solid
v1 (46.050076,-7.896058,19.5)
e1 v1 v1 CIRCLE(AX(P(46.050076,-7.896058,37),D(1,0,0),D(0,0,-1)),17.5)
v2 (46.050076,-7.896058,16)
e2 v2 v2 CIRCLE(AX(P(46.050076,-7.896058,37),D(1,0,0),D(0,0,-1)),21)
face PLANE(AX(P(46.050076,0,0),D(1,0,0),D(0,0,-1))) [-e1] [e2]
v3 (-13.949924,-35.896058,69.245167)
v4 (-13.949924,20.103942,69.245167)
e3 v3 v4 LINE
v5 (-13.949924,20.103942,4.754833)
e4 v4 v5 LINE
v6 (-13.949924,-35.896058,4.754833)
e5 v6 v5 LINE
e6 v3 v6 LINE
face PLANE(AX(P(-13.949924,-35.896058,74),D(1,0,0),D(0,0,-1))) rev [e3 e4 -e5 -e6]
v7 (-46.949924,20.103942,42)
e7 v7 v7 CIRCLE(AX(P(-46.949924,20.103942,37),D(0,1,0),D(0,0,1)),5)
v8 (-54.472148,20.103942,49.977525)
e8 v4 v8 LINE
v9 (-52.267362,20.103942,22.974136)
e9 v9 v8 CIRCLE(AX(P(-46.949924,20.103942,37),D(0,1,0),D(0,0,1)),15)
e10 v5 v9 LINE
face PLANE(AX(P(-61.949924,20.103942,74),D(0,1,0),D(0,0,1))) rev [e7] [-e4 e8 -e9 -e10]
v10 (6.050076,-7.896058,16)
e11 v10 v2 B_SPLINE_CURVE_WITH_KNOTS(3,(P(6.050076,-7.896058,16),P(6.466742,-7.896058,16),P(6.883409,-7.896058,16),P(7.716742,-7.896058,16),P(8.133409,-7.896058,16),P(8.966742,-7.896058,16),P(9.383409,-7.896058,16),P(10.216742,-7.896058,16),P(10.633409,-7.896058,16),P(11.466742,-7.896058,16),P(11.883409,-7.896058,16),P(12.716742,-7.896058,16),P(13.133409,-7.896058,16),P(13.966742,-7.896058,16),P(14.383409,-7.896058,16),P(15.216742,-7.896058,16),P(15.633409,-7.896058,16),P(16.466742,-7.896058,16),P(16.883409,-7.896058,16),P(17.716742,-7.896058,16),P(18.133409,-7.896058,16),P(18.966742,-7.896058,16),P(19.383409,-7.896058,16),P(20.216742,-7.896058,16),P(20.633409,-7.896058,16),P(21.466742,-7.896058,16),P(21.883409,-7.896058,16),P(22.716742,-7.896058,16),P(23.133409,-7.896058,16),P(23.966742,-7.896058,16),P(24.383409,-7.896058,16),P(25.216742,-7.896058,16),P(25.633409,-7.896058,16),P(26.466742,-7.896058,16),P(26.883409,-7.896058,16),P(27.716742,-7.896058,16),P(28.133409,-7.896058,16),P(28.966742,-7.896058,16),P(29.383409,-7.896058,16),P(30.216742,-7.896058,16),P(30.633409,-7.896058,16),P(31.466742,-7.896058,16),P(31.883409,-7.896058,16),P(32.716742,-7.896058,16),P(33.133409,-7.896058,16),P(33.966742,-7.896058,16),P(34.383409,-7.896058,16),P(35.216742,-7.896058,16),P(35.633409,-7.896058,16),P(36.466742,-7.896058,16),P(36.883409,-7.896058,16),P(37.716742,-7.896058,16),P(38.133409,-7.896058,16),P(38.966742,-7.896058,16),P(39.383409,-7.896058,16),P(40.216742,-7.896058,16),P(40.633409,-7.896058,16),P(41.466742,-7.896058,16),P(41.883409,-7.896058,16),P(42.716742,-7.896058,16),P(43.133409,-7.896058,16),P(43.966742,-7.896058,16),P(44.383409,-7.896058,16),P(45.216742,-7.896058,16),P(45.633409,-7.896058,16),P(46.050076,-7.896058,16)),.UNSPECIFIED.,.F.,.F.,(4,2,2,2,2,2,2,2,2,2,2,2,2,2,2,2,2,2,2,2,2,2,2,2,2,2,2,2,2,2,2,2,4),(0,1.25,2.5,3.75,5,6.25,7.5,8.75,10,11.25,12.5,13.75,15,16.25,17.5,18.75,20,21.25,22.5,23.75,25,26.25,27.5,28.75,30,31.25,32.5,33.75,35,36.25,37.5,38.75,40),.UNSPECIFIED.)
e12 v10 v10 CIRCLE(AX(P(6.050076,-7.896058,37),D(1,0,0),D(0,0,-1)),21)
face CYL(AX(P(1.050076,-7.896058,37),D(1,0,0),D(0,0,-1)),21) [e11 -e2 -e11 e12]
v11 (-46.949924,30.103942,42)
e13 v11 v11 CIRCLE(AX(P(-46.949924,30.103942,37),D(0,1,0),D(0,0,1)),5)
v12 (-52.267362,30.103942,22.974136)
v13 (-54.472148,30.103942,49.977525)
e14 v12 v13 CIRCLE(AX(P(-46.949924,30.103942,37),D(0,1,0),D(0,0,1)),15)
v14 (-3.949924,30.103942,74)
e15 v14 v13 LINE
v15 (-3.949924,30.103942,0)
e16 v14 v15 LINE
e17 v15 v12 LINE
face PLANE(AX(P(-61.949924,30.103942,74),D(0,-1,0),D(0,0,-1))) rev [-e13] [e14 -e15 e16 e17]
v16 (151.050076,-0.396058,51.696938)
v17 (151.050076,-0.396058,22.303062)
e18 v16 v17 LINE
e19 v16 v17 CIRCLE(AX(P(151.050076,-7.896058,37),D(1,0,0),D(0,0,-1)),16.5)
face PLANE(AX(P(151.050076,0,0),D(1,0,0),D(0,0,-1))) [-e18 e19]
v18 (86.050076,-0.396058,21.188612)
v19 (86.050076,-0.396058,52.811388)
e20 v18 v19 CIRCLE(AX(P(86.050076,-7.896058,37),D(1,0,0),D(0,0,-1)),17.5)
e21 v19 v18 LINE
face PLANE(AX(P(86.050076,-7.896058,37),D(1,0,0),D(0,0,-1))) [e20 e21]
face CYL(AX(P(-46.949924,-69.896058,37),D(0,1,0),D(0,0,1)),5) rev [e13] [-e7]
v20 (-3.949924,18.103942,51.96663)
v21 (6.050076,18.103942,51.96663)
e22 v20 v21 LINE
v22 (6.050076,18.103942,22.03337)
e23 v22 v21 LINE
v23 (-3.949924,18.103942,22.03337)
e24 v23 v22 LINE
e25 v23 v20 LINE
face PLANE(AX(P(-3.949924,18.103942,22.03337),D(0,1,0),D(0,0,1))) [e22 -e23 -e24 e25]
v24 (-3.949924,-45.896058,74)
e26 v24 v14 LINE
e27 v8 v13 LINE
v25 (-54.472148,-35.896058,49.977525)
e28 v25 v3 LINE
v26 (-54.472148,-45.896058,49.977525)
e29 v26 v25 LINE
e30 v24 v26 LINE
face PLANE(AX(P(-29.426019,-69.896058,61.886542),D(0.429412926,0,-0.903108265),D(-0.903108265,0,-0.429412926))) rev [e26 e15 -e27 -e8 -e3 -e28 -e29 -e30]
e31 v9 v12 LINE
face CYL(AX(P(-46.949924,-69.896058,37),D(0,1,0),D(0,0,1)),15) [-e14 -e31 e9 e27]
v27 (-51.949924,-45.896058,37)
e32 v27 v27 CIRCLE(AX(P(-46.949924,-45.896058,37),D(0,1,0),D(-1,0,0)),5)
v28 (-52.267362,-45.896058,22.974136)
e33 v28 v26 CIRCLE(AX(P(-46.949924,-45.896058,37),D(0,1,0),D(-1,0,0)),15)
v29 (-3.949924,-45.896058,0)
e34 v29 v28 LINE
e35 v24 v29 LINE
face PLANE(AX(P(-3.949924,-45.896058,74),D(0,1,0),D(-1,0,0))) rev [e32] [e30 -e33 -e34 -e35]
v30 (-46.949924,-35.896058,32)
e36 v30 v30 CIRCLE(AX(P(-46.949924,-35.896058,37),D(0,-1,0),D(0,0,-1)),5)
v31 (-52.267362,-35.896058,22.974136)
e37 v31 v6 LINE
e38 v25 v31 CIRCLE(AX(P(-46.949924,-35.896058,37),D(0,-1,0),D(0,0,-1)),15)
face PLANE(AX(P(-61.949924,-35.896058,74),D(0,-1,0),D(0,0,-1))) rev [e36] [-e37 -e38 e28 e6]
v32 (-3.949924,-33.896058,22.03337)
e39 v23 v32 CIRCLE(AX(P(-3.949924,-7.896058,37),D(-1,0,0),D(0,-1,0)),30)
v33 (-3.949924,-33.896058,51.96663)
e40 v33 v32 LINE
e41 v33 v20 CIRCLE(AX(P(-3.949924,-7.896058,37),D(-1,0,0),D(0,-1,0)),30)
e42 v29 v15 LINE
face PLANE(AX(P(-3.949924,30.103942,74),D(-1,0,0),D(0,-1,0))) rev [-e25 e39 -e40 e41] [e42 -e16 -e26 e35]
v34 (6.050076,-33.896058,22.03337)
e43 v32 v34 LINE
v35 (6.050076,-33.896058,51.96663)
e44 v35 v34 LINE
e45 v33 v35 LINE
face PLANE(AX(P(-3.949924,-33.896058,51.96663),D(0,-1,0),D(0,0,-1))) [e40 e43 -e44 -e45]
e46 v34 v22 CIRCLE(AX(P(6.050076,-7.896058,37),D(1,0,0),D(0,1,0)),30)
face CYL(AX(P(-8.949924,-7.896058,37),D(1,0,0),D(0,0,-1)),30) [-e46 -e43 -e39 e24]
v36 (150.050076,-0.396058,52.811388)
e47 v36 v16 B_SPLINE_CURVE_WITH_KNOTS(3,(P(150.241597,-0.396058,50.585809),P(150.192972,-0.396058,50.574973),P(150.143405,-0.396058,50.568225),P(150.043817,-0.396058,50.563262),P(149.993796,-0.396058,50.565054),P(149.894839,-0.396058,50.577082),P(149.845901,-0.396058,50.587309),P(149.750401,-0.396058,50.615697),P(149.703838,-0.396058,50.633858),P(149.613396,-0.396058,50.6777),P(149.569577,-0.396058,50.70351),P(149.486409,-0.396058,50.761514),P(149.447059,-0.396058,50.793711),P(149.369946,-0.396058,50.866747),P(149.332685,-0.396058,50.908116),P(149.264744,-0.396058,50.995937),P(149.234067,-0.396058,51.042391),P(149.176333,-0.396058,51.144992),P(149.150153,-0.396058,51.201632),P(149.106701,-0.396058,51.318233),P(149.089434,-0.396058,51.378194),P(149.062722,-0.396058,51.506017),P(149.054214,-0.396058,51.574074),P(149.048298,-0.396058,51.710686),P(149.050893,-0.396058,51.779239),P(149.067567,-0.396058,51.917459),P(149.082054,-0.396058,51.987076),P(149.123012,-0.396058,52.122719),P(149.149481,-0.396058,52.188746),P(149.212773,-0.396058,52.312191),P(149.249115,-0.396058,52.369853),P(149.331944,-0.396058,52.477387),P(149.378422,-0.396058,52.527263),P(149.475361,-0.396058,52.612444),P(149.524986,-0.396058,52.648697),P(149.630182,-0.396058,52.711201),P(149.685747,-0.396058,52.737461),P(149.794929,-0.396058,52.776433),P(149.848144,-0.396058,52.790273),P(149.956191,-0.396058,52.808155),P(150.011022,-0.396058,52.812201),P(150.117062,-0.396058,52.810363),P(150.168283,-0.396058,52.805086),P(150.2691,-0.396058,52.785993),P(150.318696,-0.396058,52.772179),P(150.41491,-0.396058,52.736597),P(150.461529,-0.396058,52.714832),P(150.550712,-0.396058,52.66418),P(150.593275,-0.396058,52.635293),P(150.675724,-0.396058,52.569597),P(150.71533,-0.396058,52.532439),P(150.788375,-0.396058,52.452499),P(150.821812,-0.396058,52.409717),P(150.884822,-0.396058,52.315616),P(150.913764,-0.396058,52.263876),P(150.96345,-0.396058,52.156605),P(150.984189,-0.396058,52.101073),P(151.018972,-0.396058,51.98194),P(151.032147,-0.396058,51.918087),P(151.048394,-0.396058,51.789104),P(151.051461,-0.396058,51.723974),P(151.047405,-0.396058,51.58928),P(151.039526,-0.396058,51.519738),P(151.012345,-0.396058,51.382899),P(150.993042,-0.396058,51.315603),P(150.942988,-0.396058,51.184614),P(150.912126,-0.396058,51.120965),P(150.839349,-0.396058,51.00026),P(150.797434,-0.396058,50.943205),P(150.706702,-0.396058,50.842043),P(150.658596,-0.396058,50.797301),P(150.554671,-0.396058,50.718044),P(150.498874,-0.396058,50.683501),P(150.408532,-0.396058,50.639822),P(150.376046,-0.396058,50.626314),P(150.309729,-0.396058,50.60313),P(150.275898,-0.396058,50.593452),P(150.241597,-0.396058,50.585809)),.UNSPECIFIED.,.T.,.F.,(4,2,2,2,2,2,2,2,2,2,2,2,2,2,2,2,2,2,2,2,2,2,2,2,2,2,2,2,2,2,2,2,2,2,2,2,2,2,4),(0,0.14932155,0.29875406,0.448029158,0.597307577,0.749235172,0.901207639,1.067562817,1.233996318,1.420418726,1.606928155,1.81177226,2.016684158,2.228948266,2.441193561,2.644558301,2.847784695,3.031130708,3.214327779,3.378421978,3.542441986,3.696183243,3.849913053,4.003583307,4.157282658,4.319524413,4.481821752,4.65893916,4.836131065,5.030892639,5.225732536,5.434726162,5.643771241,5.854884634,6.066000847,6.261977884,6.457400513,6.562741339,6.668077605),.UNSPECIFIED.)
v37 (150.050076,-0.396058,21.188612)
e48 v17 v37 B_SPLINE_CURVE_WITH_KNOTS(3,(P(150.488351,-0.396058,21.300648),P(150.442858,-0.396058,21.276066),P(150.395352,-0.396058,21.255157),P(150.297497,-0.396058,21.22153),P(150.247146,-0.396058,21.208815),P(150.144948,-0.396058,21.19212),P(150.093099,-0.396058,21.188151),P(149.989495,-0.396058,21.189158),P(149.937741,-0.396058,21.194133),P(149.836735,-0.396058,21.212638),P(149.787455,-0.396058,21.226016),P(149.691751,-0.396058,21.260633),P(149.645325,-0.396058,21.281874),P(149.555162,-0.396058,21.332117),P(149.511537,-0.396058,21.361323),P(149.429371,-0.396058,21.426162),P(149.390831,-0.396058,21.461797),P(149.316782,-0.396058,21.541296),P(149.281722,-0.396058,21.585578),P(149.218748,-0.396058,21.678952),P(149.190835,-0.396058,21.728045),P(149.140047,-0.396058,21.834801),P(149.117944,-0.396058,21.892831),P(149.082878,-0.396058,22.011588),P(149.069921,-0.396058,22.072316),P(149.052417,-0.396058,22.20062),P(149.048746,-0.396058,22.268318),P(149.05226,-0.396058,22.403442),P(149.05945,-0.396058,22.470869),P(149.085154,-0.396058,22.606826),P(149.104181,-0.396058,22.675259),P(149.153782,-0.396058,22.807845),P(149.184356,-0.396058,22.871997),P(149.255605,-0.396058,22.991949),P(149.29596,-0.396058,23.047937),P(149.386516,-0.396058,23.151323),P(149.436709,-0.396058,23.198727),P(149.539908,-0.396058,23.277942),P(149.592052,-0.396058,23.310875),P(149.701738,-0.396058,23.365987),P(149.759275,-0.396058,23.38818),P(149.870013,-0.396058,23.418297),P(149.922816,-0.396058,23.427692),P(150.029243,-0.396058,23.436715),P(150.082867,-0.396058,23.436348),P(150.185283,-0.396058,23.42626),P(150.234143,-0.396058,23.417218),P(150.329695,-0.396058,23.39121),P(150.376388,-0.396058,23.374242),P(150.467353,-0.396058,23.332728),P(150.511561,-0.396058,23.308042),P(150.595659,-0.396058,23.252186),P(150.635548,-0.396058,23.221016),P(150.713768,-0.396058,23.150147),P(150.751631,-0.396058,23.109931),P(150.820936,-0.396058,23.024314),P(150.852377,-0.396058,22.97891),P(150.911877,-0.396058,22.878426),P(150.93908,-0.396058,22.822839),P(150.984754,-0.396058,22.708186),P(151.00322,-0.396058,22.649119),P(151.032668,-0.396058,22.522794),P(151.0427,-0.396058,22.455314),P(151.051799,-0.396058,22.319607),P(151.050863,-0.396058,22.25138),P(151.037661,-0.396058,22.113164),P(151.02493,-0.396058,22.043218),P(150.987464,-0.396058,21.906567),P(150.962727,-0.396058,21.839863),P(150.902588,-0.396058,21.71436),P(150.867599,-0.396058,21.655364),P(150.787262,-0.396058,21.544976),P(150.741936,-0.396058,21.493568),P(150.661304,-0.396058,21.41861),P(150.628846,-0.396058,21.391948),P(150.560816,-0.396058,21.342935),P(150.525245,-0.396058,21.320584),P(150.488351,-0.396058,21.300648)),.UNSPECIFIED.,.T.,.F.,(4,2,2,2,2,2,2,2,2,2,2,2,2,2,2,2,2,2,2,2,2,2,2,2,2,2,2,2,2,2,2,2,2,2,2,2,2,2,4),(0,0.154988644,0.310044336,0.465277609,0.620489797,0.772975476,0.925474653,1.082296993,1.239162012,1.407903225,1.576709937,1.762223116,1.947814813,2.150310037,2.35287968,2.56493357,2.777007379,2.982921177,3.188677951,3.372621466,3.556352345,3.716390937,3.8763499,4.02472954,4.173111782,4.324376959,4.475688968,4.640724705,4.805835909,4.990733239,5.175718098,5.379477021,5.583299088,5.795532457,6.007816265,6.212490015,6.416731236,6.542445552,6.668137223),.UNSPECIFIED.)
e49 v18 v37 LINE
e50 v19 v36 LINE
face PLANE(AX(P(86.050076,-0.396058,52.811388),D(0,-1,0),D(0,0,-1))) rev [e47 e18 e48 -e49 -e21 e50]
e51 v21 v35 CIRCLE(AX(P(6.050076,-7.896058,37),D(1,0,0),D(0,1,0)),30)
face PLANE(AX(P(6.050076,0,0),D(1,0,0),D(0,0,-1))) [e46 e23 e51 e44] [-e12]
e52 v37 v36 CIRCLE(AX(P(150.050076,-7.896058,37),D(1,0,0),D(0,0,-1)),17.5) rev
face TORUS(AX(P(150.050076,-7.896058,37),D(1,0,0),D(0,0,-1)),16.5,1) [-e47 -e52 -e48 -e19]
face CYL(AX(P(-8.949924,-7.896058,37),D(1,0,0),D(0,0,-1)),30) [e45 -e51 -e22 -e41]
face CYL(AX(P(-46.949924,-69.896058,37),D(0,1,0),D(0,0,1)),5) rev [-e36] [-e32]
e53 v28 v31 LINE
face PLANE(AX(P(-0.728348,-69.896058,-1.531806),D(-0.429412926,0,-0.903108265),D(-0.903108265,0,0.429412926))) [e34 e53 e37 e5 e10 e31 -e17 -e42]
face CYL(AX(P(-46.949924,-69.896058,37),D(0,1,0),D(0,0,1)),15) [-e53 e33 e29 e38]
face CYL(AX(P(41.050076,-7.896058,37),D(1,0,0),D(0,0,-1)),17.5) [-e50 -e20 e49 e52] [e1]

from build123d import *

# Parameters (mm, degrees)
BOSS_EXTRUDE1_DEPTH = 74
CUT_EXTRUDE1_DEPTH  = 100
SKETCH3_R           = 5
CUT_EXTRUDE2_DEPTH  = 100
F_3DSKETCH4_R       = 30
BOSS_EXTRUDE2_DEPTH = 15
F_3DSKETCH5_R       = 21
BOSS_EXTRUDE3_DEPTH = 45
F_3DSKETCH6_R       = 17.5
BOSS_EXTRUDE4_DEPTH = 110
FILLET1_R           = 1
CUT_EXTRUDE3_START  = -65
CUT_EXTRUDE3_DEPTH  = 65
CUT_EXTRUDE4_START  = -10
CUT_EXTRUDE4_DEPTH  = 10


with BuildPart() as part:
    # Sketch1 → Boss-Extrude1 (new body)
    with BuildSketch(Plane.XY):
        Polygon((-61.949924481, 30.103941839), (-61.949924481, 20.103941839), (-13.949924481, 20.103941839), (-13.949924481, -35.896058161), (-61.949924481, -35.896058161), (-61.949924481, -45.896058161), (-3.949924481, -45.896058161), (-3.949924481, 30.103941839), align=None)
    extrude(amount=BOSS_EXTRUDE1_DEPTH)

    # Sketch2 → Cut-Extrude1 (cut)
    with BuildSketch(Plane(origin=(0, 30.103941839, 0), x_dir=(1, 0, 0), z_dir=(0, 1, 0))):
        with BuildLine():
            Line((-61.949924481, -74), (-3.949924481, -74))
            Line((-3.949924481, -74), (-54.47214826, -49.97752478))
            ThreePointArc((-54.47214826, -49.97752478), (-59.946719407, -44.488879866), (-61.949924481, -37))
            Line((-61.949924481, -37), (-61.949924481, -74))
        make_face()
        with BuildLine():
            Line((-61.949924481, 0), (-61.949924481, -37))
            ThreePointArc((-61.949924481, -37), (-59.294185522, -28.478308892), (-52.267361901, -22.974136059))
            Line((-52.267361901, -22.974136059), (-3.949924481, 0))
            Line((-3.949924481, 0), (-61.949924481, 0))
        make_face()
    extrude(amount=-CUT_EXTRUDE1_DEPTH, mode=Mode.SUBTRACT)

    # Sketch3 → Cut-Extrude2 (cut)
    with BuildSketch(Plane(origin=(0, 30.103941839, 0), x_dir=(1, 0, 0), z_dir=(0, 1, 0))):
        with Locations((-46.949924481, -37)):
            Circle(SKETCH3_R)
    extrude(amount=-CUT_EXTRUDE2_DEPTH, mode=Mode.SUBTRACT)

    # 3DSketch4 → Boss-Extrude2 (add)
    with BuildSketch(Plane(origin=(-8.949924481, -7.896058161, 37), x_dir=(0, 0, 1), z_dir=(1, 0, 0))):
        Circle(F_3DSKETCH4_R)
    extrude(amount=BOSS_EXTRUDE2_DEPTH)

    # 3DSketch5 → Boss-Extrude3 (add)
    with BuildSketch(Plane(origin=(1.050075519, -7.896058161, 37), x_dir=(0, 0, 1), z_dir=(1, 0, 0))):
        Circle(F_3DSKETCH5_R)
    extrude(amount=BOSS_EXTRUDE3_DEPTH)

    # 3DSketch6 → Boss-Extrude4 (add)
    with BuildSketch(Plane(origin=(41.050075519, -7.896058161, 37), x_dir=(0, 0, 1), z_dir=(1, 0, 0))):
        Circle(F_3DSKETCH6_R)
    extrude(amount=BOSS_EXTRUDE4_DEPTH)

    # Fillet1
    fillet1_edges = [part.edges().sort_by_distance(p)[0] for p in [
        (151.050075519, -7.896058161, 19.5),
    ]]
    fillet(fillet1_edges, radius=FILLET1_R)

    # Sketch4 → Cut-Extrude3 (cut)
    with BuildSketch(Plane(origin=(151.050075519, 0, 0), x_dir=(0, 0, -1), z_dir=(1, 0, 0)).offset(CUT_EXTRUDE3_START)):
        with BuildLine():
            Line((-52.811388301, -0.396058161), (-21.188611699, -0.396058161))
            ThreePointArc((-21.188611699, -0.396058161), (-37, 9.603941839), (-52.811388301, -0.396058161))
        make_face()
    extrude(amount=CUT_EXTRUDE3_DEPTH, mode=Mode.SUBTRACT)

    # Sketch5 → Cut-Extrude4 (cut)
    with BuildSketch(Plane(origin=(6.050075519, 0, 0), x_dir=(0, 0, -1), z_dir=(1, 0, 0)).offset(CUT_EXTRUDE4_START)):
        with BuildLine():
            Line((-22.033370453, 18.103941839), (-51.966629547, 18.103941839))
            ThreePointArc((-51.966629547, 18.103941839), (-37, 22.103941839), (-22.033370453, 18.103941839))
        make_face()
        with BuildLine():
            Line((-51.966629547, -33.896058161), (-22.033370453, -33.896058161))
            ThreePointArc((-22.033370453, -33.896058161), (-37, -37.896058161), (-51.966629547, -33.896058161))
        make_face()
    extrude(amount=CUT_EXTRUDE4_DEPTH, mode=Mode.SUBTRACT)


solid = part.part
